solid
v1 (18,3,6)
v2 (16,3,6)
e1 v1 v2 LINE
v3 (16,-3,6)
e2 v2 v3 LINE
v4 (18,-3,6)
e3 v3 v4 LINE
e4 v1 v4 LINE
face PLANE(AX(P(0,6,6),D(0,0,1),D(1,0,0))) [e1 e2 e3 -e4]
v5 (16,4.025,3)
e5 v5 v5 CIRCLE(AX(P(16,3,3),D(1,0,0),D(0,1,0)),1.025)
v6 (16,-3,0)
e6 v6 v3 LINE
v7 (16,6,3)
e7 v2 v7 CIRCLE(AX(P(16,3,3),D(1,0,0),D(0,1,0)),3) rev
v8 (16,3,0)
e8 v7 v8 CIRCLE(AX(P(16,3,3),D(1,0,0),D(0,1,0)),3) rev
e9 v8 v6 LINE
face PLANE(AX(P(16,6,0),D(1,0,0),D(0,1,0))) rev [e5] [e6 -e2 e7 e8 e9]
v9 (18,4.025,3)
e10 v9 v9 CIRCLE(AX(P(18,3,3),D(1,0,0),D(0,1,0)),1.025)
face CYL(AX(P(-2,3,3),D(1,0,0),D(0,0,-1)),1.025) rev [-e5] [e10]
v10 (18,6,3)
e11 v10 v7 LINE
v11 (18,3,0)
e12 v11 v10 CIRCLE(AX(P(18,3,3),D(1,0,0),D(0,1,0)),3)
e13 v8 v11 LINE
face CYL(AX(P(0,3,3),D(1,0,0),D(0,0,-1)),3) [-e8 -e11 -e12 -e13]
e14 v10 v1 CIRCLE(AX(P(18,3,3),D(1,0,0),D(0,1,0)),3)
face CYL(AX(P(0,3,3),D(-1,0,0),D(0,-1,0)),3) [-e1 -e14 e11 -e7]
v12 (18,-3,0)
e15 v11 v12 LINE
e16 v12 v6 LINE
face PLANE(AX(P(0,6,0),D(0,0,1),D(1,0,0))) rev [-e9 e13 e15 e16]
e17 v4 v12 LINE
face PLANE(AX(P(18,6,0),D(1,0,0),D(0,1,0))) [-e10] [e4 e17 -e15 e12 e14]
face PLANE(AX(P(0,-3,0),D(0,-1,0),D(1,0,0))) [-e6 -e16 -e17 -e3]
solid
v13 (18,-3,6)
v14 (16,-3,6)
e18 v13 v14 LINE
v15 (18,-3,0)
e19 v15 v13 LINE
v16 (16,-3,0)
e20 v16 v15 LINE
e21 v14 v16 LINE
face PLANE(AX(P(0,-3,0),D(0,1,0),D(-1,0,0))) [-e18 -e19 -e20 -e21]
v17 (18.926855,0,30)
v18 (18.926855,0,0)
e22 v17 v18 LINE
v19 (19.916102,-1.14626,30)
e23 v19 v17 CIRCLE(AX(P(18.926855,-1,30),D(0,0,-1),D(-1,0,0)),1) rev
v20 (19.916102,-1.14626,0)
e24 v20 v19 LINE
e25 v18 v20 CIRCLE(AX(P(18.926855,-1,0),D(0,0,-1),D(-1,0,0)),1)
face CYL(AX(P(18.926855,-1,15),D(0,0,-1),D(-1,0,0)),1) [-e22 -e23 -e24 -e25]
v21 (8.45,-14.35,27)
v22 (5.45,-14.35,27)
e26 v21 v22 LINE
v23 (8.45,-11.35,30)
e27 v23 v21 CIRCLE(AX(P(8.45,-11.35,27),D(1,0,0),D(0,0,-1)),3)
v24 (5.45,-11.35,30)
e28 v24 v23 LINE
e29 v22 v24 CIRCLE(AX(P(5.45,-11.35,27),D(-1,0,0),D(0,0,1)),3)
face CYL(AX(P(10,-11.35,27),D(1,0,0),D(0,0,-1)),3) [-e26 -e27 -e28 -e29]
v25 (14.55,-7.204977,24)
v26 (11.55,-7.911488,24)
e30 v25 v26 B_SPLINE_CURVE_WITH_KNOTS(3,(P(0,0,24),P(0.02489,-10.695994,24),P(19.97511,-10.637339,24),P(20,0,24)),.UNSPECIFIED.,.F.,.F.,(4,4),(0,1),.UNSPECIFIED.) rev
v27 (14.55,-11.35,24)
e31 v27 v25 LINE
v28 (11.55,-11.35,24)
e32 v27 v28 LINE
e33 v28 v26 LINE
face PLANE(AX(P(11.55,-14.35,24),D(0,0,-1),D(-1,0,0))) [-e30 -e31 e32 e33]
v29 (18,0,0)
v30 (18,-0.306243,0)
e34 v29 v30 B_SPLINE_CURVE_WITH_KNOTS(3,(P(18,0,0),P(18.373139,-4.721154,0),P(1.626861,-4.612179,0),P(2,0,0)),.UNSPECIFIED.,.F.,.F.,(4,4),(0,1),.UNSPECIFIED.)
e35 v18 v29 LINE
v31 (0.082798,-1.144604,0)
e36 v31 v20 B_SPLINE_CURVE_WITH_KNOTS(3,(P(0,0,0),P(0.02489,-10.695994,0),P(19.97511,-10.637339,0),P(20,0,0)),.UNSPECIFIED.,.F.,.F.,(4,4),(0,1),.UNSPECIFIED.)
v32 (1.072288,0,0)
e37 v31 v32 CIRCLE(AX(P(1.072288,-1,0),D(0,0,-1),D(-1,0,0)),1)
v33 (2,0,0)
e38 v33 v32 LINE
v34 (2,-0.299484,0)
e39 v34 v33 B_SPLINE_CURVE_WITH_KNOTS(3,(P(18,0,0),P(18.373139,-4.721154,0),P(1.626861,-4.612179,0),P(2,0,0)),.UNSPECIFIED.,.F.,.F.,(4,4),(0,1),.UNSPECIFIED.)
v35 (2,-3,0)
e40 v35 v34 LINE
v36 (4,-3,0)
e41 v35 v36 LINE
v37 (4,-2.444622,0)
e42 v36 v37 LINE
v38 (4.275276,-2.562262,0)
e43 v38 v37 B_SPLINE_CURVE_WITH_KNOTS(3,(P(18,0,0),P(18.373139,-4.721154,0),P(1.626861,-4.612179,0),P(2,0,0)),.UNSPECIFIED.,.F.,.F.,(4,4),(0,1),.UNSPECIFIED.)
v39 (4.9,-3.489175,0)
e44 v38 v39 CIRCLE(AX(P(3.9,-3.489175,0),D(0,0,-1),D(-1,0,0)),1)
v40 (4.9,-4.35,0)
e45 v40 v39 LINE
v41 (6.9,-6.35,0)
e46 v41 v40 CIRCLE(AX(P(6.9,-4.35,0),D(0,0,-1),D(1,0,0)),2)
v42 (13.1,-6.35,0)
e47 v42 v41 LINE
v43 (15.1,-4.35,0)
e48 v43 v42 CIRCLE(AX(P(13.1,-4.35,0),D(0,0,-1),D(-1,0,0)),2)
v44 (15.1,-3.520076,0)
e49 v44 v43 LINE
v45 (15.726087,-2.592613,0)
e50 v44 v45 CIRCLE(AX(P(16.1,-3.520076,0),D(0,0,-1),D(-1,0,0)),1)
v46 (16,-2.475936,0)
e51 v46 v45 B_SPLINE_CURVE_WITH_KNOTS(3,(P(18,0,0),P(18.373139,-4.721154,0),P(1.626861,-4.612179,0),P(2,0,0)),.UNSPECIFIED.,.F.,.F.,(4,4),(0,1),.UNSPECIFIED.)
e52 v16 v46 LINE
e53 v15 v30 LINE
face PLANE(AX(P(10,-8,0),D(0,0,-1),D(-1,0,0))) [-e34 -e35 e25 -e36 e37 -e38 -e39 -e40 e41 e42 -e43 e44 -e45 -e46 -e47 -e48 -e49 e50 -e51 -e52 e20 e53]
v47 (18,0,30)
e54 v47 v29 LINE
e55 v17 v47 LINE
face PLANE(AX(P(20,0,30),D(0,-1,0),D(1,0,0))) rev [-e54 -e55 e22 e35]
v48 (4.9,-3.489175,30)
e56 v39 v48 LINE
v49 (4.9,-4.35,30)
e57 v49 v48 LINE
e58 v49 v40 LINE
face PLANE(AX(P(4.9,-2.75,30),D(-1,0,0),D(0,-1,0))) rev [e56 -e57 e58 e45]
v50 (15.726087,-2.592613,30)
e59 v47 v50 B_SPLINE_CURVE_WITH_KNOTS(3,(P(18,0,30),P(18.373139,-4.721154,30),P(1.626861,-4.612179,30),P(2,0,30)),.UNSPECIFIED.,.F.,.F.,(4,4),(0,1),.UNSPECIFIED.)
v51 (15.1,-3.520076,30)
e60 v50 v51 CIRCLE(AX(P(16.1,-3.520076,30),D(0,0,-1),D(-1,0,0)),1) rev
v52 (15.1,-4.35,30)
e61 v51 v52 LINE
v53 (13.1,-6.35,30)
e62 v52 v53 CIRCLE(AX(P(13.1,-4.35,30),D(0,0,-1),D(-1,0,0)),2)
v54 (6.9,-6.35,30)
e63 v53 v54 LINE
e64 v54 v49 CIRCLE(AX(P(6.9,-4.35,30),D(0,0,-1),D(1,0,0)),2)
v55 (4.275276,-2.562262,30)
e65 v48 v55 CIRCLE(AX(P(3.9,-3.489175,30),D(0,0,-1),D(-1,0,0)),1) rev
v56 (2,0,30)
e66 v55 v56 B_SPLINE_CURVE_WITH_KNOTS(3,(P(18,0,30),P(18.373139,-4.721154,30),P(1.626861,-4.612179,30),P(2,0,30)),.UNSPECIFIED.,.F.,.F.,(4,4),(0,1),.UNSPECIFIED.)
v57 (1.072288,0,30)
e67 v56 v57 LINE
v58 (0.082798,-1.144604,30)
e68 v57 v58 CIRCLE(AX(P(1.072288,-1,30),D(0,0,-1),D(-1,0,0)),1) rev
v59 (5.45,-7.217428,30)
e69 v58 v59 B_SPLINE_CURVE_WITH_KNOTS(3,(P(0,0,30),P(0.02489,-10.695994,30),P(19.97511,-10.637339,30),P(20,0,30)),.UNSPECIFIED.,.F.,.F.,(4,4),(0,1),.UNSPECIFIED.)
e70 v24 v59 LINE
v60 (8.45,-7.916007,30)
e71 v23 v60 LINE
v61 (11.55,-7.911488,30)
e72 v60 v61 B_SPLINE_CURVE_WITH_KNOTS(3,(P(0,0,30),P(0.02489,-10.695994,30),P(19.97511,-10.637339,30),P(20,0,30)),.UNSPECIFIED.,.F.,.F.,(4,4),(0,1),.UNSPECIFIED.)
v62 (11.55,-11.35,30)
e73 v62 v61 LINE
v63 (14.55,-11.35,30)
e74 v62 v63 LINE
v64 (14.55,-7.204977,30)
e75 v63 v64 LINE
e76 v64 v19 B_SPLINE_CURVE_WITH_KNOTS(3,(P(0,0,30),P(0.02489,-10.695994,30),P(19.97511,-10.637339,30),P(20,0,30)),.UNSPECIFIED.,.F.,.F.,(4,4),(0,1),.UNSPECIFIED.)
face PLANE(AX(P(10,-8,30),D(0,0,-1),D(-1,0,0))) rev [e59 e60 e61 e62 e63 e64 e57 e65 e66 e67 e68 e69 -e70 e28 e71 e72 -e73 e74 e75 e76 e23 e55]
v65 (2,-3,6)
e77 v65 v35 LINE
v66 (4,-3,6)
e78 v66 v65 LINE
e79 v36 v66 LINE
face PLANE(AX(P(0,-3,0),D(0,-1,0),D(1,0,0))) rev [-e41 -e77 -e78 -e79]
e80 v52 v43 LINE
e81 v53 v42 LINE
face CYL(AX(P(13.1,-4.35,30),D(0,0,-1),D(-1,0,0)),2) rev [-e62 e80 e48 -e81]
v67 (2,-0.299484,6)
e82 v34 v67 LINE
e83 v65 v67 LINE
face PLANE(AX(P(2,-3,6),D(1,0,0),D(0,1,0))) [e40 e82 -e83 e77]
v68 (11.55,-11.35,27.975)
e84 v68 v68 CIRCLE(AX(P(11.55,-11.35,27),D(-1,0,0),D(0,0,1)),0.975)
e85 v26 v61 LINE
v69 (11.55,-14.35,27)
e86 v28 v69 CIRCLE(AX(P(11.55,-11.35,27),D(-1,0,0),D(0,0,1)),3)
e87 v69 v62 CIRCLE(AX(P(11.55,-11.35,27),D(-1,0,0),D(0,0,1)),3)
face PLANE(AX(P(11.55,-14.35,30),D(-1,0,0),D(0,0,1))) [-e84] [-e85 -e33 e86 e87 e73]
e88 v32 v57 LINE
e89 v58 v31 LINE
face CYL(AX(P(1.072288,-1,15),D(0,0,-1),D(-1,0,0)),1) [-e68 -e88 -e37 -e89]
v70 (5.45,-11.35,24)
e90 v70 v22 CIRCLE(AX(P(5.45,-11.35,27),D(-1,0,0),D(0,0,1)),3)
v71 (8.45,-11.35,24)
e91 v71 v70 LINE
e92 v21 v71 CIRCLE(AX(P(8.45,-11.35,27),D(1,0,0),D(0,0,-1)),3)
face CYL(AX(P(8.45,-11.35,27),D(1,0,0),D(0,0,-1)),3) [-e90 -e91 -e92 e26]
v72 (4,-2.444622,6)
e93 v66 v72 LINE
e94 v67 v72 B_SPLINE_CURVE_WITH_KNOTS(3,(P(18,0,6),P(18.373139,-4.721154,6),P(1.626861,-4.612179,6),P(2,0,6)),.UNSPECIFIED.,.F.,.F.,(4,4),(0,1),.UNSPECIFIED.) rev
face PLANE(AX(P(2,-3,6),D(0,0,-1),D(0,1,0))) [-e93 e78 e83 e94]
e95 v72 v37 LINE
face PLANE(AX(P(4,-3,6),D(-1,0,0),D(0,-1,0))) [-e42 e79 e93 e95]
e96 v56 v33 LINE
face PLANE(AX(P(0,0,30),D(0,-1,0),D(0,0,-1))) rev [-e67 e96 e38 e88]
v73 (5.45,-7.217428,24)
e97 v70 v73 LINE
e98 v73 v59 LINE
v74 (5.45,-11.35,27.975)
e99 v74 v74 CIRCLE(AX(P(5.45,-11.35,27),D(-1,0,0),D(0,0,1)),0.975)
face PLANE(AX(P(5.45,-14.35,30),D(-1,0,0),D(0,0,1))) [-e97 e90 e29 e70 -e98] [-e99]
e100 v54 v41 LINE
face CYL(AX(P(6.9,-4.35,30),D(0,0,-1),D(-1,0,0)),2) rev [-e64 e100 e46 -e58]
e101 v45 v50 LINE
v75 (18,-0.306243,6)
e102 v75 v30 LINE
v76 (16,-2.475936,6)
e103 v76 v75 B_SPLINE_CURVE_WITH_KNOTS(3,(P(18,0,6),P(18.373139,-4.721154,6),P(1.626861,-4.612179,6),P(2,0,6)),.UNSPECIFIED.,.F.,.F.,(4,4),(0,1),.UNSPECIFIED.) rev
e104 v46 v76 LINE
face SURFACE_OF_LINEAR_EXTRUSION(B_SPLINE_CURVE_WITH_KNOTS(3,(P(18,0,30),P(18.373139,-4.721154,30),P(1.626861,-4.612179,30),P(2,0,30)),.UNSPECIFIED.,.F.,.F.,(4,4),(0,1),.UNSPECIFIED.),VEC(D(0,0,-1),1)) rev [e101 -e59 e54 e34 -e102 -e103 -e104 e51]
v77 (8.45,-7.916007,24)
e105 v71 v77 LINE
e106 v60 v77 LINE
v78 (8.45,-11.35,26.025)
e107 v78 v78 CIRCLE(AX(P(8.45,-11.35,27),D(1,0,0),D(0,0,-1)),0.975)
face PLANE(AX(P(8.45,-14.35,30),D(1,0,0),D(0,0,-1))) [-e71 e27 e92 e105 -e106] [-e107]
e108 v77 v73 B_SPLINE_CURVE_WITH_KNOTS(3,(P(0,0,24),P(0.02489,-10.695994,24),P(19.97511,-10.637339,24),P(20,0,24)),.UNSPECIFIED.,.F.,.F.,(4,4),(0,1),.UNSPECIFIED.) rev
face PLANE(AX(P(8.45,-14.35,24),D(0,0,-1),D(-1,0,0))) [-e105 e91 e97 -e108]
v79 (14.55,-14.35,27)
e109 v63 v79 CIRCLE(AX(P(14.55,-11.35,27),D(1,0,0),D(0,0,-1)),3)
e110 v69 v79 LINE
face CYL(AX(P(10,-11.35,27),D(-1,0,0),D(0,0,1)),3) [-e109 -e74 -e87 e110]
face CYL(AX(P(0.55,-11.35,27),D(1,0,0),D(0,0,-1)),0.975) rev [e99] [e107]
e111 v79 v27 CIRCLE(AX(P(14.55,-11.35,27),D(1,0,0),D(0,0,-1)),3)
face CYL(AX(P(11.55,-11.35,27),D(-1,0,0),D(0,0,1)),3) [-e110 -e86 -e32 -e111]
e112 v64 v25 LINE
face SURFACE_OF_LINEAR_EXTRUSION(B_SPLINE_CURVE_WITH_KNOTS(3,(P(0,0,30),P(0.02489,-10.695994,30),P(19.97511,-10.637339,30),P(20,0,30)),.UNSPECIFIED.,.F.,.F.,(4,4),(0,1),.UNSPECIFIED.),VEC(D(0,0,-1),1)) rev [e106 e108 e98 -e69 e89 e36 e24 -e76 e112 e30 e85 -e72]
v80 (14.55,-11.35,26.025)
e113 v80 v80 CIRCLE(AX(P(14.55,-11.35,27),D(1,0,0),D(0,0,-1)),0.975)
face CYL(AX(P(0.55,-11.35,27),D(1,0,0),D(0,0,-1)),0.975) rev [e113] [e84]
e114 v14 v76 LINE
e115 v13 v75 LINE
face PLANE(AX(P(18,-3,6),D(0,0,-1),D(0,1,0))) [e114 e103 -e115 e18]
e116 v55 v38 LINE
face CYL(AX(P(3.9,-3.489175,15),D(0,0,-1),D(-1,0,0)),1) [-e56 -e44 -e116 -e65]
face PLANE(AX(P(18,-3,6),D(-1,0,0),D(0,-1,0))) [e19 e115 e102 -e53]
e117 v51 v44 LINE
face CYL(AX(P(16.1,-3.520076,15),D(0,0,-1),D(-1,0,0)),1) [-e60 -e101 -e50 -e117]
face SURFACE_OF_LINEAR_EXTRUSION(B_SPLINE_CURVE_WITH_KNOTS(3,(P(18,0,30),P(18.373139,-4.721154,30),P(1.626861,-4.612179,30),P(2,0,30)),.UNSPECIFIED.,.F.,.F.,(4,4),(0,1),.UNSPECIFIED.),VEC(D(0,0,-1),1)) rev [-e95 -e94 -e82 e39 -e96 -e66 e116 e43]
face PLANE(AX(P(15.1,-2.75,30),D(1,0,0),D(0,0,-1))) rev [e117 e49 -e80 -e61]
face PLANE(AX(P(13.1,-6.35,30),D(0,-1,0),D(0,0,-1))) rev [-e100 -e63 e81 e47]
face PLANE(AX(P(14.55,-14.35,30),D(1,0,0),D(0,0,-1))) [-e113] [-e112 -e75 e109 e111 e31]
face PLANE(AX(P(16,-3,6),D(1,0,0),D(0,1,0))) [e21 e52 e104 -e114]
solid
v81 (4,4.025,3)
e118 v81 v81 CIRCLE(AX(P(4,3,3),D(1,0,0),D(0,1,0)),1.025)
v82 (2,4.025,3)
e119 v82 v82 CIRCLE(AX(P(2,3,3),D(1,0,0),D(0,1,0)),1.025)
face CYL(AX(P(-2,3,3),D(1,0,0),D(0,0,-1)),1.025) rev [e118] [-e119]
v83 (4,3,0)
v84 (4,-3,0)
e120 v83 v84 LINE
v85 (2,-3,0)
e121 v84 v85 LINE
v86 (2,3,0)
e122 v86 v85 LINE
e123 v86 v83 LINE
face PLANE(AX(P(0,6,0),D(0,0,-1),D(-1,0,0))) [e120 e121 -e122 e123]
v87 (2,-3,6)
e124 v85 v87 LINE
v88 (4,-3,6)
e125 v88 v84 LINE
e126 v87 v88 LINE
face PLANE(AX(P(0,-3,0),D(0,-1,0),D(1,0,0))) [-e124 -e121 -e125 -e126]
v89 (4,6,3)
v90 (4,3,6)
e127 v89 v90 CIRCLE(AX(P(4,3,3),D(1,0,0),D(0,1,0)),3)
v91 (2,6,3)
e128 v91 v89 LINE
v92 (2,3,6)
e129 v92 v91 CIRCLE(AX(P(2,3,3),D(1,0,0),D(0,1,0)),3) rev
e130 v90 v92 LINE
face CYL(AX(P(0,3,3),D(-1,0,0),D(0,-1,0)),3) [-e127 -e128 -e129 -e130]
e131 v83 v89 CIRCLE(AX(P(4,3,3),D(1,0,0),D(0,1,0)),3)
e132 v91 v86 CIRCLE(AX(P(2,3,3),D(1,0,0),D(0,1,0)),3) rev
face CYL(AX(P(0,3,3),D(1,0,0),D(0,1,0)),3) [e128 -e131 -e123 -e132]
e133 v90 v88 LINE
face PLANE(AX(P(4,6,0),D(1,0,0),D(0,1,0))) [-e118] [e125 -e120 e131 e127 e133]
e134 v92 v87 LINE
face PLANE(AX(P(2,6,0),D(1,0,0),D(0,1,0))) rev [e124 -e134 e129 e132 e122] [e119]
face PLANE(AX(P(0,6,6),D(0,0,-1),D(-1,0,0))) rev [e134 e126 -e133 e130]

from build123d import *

# Parameters (mm, degrees)
BOSS_EXTRUDE1_DEPTH   = 30
CUT_EXTRUDE2_DEPTH    = 30
SKETCH3_W             = 2
SKETCH3_H             = 6
BOSS_EXTRUDE2_DEPTH   = 6
BOSS_EXTRUDE2_2_DEPTH = 6
SKETCH8_W             = 2
SKETCH8_H             = 6
CUT_EXTRUDE5_DEPTH    = 3
SKETCH9_W             = 2
SKETCH9_H             = 6
BOSS_EXTRUDE5_DEPTH   = 3
SKETCH5_R             = 1.025
CUT_EXTRUDE6_DEPTH    = 22
SKETCH10_W            = 3
SKETCH10_H            = 6
BOSS_EXTRUDE6_DEPTH   = 8
SKETCH11_R            = 0.975
CUT_EXTRUDE7_DEPTH    = 14
FILLET1_R             = 3
FILLET2_R             = 3
FILLET3_R             = 3
FILLET4_R             = 1


with BuildPart() as part:
    # Sketch1 → Boss-Extrude1 (new body)
    with BuildSketch(Plane.XY):
        with BuildLine():
            Line((0, 0), (2, 0))
            add(Edge.make_bspline(
                [(2, 0), (1.626861105, -4.612179168), (18.373138895, -4.721154165), (18, 0)],
                knots=[0, 0, 0, 0, 1, 1, 1, 1], degree=3))
            Line((18, 0), (20, 0))
            add(Edge.make_bspline(
                [(0, 0), (0.02488992, -10.695993841), (19.97511008, -10.637339492), (20, 0)],
                knots=[0, 0, 0, 0, 1, 1, 1, 1], degree=3))
        make_face()
    extrude(amount=BOSS_EXTRUDE1_DEPTH)

    # Sketch2 → Cut-Extrude2 (cut)
    with BuildSketch(Plane(origin=(0, 0, 0), x_dir=(-1, 0, 0), z_dir=(0, 0, -1))):
        with BuildLine():
            Line((-15.1, -2.75), (-4.9, -2.75))
            Line((-4.9, -2.75), (-4.9, -4.35))
            ThreePointArc((-4.9, -4.35), (-5.485786438, -5.764213562), (-6.9, -6.35))
            Line((-6.9, -6.35), (-13.1, -6.35))
            ThreePointArc((-13.1, -6.35), (-14.514213562, -5.764213562), (-15.1, -4.35))
            Line((-15.1, -4.35), (-15.1, -2.75))
        make_face()
    extrude(amount=-CUT_EXTRUDE2_DEPTH, mode=Mode.SUBTRACT)

    # Sketch8 → Cut-Extrude5 (cut)
    with BuildSketch(Plane.XZ):
        with Locations((3, 3)):
            Rectangle(SKETCH8_W, SKETCH8_H)
        with Locations((17, 3)):
            Rectangle(SKETCH8_W, SKETCH8_H)
    extrude(amount=CUT_EXTRUDE5_DEPTH, mode=Mode.SUBTRACT)

    # Sketch10 → Boss-Extrude6 (add)
    with BuildSketch(Plane(origin=(0, -6.35, 0), x_dir=(1, 0, 0), z_dir=(0, 1, 0))):
        with Locations((13.05, -27)):
            Rectangle(SKETCH10_W, SKETCH10_H)
        with Locations((6.95, -27)):
            Rectangle(SKETCH10_W, SKETCH10_H)
    extrude(amount=-BOSS_EXTRUDE6_DEPTH)

    # Sketch11 → Cut-Extrude7 (cut)
    with BuildSketch(Plane(origin=(14.55, 0, 0), x_dir=(0, 0, -1), z_dir=(1, 0, 0))):
        with Locations((-27, -11.35)):
            Circle(SKETCH11_R)
    extrude(amount=-CUT_EXTRUDE7_DEPTH, mode=Mode.SUBTRACT)

    # Fillet3
    fillet3_edges = [part.edges().sort_by_distance(p)[0] for p in [
        (13.05, -14.35, 30),
        (13.05, -14.35, 24),
        (6.95, -14.35, 24),
        (6.95, -14.35, 30),
    ]]
    fillet(fillet3_edges, radius=FILLET3_R - 0.0001)  # a hair under: the kernel refuses the full size

    # Fillet4
    fillet4_edges = [part.edges().sort_by_distance(p)[0] for p in [
        (20, 0, 15),
        (0, 0, 15),
        (15.1, -2.817474899, 15),
        (4.9, -2.788263927, 15),
    ]]
    fillet(fillet4_edges, radius=FILLET4_R)


with BuildPart() as body_2:
    # Sketch3 → Boss-Extrude2 (new body)
    with BuildSketch(Plane(origin=(0, 0, 0), x_dir=(1, 0, 0), z_dir=(0, 1, 0))):
        with Locations((3, -3)):
            Rectangle(SKETCH3_W, SKETCH3_H)
    extrude(amount=BOSS_EXTRUDE2_DEPTH)



with BuildPart() as body_3:
    # Sketch3 → Boss-Extrude2 2 (new body)
    with BuildSketch(Plane(origin=(0, 0, 0), x_dir=(1, 0, 0), z_dir=(0, 1, 0))):
        with Locations((17, -3)):
            Rectangle(SKETCH3_W, SKETCH3_H)
    extrude(amount=BOSS_EXTRUDE2_2_DEPTH)


with BuildPart() as body_2_1:
    add(body_2.part)

    add(body_3.part)  # Boss-Extrude5 merges body 3
    # Sketch9 → Boss-Extrude5 (add)
    with BuildSketch(Plane(origin=(0, -3, 0), x_dir=(1, 0, 0), z_dir=(0, 1, 0))):
        with Locations((3, -3)):
            Rectangle(SKETCH9_W, SKETCH9_H)
        with Locations((17, -3)):
            Rectangle(SKETCH9_W, SKETCH9_H)
    extrude(amount=BOSS_EXTRUDE5_DEPTH)

    # Sketch5 → Cut-Extrude6 (cut)
    with BuildSketch(Plane(origin=(20, 0, 0), x_dir=(0, 0, -1), z_dir=(1, 0, 0))):
        with Locations(Location((-3, 3, 0), (0, 0, 90))):
            Circle(SKETCH5_R)
    extrude(amount=-CUT_EXTRUDE6_DEPTH, mode=Mode.SUBTRACT)

    # Fillet1
    fillet1_edges = [body_2_1.edges().sort_by_distance(p)[0] for p in [
        (17, 6, 6),
        (17, 6, 0),
    ]]
    fillet(fillet1_edges, radius=FILLET1_R - 0.0001)  # a hair under: the kernel refuses the full size

    # Fillet2
    fillet2_edges = [body_2_1.edges().sort_by_distance(p)[0] for p in [
        (3, 6, 0),
        (3, 6, 6),
    ]]
    fillet(fillet2_edges, radius=FILLET2_R - 0.0001)  # a hair under: the kernel refuses the full size


solid = Compound([part.part, body_2_1.part])
